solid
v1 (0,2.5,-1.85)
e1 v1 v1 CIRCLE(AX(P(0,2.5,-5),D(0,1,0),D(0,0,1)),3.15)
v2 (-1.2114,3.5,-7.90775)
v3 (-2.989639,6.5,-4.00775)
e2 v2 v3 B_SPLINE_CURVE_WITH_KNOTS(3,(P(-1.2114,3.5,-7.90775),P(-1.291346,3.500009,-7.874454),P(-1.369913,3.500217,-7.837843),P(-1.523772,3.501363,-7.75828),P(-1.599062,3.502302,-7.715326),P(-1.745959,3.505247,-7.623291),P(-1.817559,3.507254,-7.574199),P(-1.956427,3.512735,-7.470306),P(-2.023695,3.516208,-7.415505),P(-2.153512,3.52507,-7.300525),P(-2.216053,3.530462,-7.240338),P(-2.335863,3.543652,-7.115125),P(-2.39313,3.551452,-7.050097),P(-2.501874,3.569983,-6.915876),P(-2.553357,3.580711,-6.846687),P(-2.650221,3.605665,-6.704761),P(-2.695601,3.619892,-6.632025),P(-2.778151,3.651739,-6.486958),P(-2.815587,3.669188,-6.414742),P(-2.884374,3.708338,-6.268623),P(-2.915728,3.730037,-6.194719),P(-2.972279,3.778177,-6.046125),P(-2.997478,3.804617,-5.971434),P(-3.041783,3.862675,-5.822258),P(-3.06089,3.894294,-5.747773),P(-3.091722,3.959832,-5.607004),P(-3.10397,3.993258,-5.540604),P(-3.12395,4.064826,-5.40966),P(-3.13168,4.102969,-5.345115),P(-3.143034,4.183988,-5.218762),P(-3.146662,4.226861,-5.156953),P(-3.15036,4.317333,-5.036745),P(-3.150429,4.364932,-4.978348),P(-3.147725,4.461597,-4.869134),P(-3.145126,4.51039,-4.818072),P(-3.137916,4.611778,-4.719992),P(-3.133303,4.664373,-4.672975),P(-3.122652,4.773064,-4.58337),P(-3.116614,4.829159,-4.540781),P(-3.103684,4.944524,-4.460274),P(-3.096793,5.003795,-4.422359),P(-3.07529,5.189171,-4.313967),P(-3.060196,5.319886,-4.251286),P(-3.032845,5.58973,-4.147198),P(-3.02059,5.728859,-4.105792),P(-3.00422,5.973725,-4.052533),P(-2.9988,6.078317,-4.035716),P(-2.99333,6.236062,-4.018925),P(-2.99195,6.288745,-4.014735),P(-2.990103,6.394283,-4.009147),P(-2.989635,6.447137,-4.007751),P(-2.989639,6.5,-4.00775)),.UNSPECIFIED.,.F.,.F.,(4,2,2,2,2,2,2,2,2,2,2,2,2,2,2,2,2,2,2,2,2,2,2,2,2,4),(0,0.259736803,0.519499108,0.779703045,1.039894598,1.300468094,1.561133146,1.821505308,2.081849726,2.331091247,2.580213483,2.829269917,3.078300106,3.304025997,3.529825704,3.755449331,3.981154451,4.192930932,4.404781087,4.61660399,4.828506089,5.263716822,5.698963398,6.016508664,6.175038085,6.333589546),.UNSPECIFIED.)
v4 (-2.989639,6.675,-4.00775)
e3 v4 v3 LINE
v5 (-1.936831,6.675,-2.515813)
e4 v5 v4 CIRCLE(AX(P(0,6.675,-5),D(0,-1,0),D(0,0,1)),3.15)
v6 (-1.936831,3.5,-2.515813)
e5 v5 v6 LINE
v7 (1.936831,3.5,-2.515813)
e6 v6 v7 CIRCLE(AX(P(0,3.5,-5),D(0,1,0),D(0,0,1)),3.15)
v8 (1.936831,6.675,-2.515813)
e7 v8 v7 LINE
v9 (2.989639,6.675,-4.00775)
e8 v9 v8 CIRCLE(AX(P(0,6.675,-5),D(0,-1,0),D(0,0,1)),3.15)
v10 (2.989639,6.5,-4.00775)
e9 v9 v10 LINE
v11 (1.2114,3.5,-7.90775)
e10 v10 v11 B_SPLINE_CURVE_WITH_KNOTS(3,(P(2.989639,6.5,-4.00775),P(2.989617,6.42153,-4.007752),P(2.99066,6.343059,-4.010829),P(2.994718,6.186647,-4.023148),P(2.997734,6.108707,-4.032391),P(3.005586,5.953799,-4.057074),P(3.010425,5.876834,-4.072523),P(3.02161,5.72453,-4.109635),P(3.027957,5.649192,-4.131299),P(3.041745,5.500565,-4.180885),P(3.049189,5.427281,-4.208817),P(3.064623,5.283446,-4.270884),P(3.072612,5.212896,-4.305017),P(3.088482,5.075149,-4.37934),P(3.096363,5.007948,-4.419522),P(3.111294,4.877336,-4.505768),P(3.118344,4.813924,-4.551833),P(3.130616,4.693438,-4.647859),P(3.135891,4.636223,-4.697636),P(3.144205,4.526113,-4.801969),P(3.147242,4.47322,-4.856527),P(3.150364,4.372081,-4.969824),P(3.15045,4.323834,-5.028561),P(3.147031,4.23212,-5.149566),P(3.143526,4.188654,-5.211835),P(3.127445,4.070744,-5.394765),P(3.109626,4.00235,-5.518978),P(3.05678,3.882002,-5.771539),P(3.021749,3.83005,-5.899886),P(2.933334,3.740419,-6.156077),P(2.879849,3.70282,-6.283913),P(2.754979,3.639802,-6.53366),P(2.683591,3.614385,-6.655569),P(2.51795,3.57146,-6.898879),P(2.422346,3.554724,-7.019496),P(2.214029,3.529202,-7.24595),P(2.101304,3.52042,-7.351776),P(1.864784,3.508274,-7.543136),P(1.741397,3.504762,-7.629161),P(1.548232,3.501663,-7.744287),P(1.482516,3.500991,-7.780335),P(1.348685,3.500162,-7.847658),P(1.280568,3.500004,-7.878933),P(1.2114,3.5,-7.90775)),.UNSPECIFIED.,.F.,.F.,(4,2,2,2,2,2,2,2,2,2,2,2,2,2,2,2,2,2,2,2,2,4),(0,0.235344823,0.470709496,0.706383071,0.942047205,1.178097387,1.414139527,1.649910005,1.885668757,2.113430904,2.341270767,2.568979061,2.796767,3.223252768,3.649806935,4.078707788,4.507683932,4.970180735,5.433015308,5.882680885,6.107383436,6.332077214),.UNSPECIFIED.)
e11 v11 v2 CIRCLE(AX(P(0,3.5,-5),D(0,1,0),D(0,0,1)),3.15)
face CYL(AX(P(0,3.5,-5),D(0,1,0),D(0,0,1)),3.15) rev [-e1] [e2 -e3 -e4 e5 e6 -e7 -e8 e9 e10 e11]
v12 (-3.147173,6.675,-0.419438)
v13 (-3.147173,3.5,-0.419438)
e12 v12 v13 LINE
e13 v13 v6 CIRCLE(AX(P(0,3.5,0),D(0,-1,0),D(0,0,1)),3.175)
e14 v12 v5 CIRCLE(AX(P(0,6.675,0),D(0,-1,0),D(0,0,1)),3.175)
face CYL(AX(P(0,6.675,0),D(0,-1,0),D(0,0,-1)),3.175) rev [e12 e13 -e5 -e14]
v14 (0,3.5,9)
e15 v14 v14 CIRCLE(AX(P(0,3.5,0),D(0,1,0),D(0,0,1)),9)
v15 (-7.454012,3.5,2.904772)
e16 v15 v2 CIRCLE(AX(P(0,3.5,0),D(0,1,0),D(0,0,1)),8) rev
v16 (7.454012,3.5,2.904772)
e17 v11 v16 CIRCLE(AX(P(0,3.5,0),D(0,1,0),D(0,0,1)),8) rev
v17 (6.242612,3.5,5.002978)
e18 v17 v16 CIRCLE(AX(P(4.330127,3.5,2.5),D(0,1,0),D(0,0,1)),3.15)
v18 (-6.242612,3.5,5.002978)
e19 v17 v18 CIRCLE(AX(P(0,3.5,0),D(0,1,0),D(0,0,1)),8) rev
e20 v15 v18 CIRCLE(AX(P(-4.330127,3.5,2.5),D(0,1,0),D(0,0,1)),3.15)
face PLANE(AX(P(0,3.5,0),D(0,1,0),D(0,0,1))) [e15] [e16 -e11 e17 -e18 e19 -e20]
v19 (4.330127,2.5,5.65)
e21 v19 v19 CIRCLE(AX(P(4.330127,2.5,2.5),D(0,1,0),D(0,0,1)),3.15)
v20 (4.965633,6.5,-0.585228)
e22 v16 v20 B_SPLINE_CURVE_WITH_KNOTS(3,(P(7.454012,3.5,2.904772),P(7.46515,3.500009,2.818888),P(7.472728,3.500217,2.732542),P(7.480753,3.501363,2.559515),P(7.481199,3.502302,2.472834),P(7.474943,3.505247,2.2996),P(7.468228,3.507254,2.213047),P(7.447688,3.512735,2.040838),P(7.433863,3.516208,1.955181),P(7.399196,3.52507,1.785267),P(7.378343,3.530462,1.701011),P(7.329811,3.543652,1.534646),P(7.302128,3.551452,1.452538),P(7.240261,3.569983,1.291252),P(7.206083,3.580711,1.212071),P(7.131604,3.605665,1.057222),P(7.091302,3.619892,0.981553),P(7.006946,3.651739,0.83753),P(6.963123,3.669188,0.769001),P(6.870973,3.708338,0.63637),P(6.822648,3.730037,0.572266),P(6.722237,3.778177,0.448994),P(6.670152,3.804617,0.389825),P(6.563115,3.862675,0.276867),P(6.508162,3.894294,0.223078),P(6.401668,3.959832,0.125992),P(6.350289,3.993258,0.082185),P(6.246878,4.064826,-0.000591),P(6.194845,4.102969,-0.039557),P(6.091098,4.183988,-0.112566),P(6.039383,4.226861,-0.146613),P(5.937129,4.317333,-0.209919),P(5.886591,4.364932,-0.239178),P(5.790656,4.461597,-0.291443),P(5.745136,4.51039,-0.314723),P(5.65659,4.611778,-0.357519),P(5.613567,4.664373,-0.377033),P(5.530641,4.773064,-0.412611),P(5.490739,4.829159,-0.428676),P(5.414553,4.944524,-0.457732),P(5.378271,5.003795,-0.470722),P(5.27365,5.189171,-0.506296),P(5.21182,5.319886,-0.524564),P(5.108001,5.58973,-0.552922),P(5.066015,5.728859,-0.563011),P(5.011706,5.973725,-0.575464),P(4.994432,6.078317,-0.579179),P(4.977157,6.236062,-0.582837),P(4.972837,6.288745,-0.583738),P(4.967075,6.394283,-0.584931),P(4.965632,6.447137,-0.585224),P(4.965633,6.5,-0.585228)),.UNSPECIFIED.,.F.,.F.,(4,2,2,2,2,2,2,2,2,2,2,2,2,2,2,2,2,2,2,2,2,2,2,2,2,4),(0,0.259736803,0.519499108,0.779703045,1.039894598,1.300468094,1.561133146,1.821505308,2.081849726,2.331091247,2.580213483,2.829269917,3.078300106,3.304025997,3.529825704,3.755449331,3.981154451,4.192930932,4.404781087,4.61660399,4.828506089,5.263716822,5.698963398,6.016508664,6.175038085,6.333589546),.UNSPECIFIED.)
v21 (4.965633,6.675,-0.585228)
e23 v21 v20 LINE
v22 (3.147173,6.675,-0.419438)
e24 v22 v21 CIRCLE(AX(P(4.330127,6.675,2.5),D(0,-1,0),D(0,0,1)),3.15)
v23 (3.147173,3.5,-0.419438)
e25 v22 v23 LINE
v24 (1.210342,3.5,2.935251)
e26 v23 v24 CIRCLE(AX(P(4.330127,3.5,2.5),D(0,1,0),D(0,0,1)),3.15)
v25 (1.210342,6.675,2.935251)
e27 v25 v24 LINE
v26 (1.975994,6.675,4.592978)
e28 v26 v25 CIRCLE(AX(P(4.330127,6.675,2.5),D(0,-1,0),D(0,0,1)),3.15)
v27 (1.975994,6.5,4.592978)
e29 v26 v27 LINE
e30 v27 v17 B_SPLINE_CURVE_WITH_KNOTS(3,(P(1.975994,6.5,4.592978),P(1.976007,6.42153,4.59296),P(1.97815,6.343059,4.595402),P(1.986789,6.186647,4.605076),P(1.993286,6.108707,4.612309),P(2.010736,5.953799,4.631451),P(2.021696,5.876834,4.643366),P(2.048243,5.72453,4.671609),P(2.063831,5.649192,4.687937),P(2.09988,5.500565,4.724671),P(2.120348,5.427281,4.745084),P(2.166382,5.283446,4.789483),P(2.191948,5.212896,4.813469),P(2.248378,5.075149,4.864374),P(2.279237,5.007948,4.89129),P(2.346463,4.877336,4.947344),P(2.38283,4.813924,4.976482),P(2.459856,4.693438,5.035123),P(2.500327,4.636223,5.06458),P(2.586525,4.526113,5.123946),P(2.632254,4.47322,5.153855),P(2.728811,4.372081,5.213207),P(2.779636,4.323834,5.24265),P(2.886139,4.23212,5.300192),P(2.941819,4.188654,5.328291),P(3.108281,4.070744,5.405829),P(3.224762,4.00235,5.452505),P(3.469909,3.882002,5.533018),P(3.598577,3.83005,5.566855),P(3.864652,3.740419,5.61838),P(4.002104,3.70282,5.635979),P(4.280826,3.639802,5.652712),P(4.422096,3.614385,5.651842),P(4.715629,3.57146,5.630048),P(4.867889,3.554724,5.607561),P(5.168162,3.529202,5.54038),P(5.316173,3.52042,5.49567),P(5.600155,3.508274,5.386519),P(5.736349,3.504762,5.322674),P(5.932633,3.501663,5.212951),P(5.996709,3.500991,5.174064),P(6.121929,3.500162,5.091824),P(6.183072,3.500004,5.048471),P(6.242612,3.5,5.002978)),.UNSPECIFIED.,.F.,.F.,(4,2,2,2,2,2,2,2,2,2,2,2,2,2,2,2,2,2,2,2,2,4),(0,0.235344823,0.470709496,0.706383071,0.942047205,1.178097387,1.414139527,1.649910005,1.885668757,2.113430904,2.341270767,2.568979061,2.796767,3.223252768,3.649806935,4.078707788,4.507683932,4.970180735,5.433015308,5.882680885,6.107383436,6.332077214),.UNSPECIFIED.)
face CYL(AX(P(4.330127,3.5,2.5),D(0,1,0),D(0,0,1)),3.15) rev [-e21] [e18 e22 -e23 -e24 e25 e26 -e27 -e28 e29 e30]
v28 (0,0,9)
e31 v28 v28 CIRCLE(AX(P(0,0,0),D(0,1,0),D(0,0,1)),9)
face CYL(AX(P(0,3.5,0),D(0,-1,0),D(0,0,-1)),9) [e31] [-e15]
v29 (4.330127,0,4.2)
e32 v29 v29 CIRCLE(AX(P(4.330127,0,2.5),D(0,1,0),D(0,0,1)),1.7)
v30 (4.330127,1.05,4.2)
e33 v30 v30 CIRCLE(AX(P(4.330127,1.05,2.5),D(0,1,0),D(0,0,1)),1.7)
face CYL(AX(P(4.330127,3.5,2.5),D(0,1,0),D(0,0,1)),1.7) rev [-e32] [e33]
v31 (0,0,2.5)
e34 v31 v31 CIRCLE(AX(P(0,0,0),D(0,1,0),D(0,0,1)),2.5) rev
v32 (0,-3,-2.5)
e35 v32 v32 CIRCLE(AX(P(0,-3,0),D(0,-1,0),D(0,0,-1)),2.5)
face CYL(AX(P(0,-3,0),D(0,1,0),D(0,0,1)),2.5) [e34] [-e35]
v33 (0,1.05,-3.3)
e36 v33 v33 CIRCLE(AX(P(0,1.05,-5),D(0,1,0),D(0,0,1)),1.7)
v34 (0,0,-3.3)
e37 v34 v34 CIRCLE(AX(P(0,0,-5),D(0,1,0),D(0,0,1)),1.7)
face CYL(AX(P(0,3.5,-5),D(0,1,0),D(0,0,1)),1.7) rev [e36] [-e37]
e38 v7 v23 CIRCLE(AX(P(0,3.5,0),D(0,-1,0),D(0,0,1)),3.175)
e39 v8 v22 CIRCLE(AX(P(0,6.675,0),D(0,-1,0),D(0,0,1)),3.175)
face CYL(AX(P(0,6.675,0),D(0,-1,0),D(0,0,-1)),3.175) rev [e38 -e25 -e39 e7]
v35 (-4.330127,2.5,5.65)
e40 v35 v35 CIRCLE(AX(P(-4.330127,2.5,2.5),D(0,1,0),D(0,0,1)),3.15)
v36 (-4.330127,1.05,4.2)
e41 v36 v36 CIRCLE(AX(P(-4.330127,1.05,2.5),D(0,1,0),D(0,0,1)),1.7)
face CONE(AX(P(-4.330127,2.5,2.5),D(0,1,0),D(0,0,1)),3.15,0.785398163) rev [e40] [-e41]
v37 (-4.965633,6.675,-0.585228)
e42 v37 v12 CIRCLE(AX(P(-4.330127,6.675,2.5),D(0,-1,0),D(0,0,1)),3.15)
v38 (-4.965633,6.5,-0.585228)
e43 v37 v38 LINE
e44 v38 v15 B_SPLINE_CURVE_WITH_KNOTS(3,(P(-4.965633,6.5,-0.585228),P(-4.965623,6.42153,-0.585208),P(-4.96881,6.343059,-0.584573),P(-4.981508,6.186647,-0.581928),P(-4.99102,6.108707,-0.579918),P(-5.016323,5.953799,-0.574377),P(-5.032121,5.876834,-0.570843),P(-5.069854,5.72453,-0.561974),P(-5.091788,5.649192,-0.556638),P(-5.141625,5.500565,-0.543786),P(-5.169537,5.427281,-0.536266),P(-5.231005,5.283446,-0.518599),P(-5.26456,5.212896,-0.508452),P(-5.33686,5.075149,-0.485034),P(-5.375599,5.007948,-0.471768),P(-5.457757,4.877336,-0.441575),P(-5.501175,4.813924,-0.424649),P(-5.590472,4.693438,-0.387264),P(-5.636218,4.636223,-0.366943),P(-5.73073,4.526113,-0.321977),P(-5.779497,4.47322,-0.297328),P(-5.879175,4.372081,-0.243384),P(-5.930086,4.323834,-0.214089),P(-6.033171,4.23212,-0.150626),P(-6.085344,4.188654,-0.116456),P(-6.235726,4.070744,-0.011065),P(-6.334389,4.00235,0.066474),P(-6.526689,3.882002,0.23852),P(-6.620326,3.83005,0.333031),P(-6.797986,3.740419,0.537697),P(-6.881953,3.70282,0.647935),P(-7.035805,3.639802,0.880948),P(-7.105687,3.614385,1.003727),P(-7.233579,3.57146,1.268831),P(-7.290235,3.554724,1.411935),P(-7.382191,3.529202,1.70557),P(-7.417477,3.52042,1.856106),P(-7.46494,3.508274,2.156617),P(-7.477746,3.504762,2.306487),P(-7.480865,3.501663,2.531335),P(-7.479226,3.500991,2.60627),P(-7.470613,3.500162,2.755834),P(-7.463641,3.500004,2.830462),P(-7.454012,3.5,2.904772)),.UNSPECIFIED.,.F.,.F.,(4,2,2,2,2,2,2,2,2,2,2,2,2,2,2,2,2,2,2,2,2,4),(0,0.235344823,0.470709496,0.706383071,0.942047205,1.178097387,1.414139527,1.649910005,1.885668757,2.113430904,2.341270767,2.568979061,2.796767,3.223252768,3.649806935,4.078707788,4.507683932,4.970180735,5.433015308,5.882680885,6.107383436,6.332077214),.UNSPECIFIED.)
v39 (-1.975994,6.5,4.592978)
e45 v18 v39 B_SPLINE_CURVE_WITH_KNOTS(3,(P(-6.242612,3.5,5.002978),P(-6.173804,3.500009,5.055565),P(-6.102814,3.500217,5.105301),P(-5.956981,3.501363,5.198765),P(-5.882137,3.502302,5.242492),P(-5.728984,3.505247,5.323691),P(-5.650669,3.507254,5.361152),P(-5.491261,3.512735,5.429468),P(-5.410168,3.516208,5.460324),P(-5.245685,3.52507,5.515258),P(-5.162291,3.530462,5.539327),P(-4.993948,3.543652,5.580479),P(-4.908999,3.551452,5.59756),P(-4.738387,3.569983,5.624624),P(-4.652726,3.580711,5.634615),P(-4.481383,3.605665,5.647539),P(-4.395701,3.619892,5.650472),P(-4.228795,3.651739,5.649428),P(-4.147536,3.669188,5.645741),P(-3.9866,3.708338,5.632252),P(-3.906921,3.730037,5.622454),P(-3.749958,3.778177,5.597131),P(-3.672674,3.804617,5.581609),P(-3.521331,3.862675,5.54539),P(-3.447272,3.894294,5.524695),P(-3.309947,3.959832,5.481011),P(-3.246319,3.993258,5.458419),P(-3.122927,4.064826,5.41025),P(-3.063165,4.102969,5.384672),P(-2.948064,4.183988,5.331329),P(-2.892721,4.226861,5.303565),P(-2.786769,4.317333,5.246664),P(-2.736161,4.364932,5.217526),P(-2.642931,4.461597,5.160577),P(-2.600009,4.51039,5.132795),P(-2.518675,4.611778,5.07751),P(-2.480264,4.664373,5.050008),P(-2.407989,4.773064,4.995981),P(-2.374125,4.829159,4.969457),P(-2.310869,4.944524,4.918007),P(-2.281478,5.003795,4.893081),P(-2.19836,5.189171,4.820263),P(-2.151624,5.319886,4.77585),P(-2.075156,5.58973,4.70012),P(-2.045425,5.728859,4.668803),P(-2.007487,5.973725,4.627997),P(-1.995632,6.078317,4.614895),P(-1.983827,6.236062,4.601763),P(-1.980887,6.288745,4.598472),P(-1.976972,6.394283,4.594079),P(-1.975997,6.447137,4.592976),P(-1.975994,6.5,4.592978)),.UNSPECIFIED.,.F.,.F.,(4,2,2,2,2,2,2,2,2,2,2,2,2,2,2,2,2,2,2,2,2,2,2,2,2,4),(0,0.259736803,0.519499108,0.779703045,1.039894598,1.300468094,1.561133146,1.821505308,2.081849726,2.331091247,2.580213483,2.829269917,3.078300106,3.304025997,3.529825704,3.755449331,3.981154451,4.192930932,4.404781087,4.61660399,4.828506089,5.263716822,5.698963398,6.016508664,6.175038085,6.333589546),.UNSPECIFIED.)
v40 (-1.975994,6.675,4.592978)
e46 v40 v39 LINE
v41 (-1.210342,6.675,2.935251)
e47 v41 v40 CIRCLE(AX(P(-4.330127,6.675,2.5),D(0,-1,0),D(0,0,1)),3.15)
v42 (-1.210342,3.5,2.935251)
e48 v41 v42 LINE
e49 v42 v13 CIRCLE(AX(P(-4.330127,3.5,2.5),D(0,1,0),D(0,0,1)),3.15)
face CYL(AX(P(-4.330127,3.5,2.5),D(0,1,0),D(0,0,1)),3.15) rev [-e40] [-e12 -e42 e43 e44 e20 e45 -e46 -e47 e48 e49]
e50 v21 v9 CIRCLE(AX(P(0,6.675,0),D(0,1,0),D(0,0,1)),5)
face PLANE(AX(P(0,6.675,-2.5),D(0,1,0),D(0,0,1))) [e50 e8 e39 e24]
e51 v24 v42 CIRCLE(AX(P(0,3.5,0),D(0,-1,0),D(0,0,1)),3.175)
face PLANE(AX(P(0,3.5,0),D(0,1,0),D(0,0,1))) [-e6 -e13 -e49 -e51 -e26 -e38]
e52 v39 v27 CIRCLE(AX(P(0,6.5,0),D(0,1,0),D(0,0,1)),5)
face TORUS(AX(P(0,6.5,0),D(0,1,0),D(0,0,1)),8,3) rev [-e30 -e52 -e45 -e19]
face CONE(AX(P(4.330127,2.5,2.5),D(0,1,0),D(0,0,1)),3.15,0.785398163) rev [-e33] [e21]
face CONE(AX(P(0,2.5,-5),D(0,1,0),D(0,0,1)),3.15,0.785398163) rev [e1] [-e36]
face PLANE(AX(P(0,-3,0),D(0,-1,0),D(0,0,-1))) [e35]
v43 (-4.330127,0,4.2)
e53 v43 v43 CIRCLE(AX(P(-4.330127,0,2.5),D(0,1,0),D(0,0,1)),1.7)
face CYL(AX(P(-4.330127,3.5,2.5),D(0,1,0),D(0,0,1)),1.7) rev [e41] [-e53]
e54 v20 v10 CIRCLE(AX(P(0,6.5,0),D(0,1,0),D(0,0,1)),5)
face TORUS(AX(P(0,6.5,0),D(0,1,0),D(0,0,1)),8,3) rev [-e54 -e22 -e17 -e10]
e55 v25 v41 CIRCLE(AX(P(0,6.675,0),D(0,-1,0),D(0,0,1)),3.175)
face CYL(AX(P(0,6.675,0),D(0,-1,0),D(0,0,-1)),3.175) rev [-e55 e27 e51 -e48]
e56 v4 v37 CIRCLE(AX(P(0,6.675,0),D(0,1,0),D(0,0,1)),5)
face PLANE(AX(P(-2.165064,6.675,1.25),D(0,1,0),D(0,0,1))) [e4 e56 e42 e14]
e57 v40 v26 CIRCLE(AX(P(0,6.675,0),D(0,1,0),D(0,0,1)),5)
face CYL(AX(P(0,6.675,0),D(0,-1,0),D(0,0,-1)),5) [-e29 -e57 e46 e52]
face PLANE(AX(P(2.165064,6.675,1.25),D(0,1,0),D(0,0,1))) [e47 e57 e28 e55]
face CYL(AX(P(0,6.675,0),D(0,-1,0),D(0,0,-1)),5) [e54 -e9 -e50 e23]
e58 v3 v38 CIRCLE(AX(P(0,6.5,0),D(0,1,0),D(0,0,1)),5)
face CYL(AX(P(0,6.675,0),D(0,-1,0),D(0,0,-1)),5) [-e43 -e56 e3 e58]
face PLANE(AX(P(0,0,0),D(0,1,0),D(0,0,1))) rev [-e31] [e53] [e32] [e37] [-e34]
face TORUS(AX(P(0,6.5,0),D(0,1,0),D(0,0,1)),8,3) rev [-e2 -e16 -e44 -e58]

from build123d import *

# Parameters (mm, degrees)
SKETCH1_R                                      = 9
BOSS_EXTRUDE1_DEPTH                            = 3.5
CSK_FOR_M3_FLAT_HEAD_MACHINE_SCREW1_AT_2_COUNT = 2
CSK_FOR_M3_FLAT_HEAD_MACHINE_SCREW1_AT_2_PITCH = 8.660254038
CSK_FOR_M3_FLAT_HEAD_MACHINE_SCREW1_AT_3_COUNT = 2
CSK_FOR_M3_FLAT_HEAD_MACHINE_SCREW1_AT_3_PITCH = 8.660254038
BOSS_EXTRUDE2_START                            = 3.175
BOSS_EXTRUDE2_DEPTH                            = 3.175
FILLET1_R                                      = 3
SKETCH6_R                                      = 2.5
BOSS_EXTRUDE3_DEPTH                            = 3


with BuildPart() as part:
    # Sketch1 → Boss-Extrude1 (new body)
    with BuildSketch(Plane(origin=(0, 0, 0), x_dir=(1, 0, 0), z_dir=(0, 1, 0))):
        with Locations(Location((0, 0, 0), (0, 0, 270))):
            Circle(SKETCH1_R)
    extrude(amount=BOSS_EXTRUDE1_DEPTH)

    # Sketch3 → CSK for M3 Flat Head Machine Screw1 (revolve, cut)
    with BuildSketch(Plane(origin=(0, 3.5, -5), x_dir=(0, 0, 1), z_dir=(1, 0, 0))):
        Polygon((0, 0), (0, 11.021463052), (1.7, 10), (1.7, 2.45), (3.15, 1), (3.15, 0), align=None)
    csk_for_m3_flat_head_machine_screw1 = revolve(axis=Axis((0, 9.85, -5), (0, -1, 0)), mode=Mode.SUBTRACT)

    # CSK for M3 Flat Head Machine Screw1 at 2: CSK for M3 Flat Head Machine Screw1 ×2
    with Locations(*[Vector(0.5000000000000012, 0, 0.866025403784438) * (i * CSK_FOR_M3_FLAT_HEAD_MACHINE_SCREW1_AT_2_PITCH) for i in range(1, CSK_FOR_M3_FLAT_HEAD_MACHINE_SCREW1_AT_2_COUNT)]):
        add(csk_for_m3_flat_head_machine_screw1, mode=Mode.SUBTRACT)

    # CSK for M3 Flat Head Machine Screw1 at 3: CSK for M3 Flat Head Machine Screw1 ×2
    with Locations(*[Vector(-0.500000000000001, 0, 0.8660254037844382) * (i * CSK_FOR_M3_FLAT_HEAD_MACHINE_SCREW1_AT_3_PITCH) for i in range(1, CSK_FOR_M3_FLAT_HEAD_MACHINE_SCREW1_AT_3_COUNT)]):
        add(csk_for_m3_flat_head_machine_screw1, mode=Mode.SUBTRACT)

    # Sketch5 → Boss-Extrude2 (add)
    with BuildSketch(Plane(origin=(0, 3.5, 0), x_dir=(1, 0, 0), z_dir=(0, 1, 0)).offset(BOSS_EXTRUDE2_START)):
        with BuildLine():
            ThreePointArc((-1.93683052, 2.5158125), (-2.749630657, 1.5875), (-3.147172796, 0.419438184))
            ThreePointArc((-3.147172796, 0.419438184), (-4.044126051, 0.636989552), (-4.965632694, 0.585228118))
            ThreePointArc((-4.965632694, 0.585228118), (-4.330127019, 2.5), (-2.989638764, 4.00775))
            ThreePointArc((-2.989638764, 4.00775), (-2.573712159, 3.183821121), (-1.93683052, 2.5158125))
        make_face()
        with BuildLine():
            ThreePointArc((4.965632694, 0.585228118), (4.044126051, 0.636989552), (3.147172796, 0.419438184))
            ThreePointArc((3.147172796, 0.419438184), (2.749630657, 1.5875), (1.93683052, 2.5158125))
            ThreePointArc((1.93683052, 2.5158125), (2.573712159, 3.183821121), (2.989638764, 4.00775))
            ThreePointArc((2.989638764, 4.00775), (4.330127019, 2.5), (4.965632694, 0.585228118))
        make_face()
        with BuildLine():
            ThreePointArc((-1.97599393, -4.592978118), (-1.470413892, -3.820810672), (-1.210342276, -2.935250684))
            ThreePointArc((-1.210342276, -2.935250684), (0, -3.175), (1.210342276, -2.935250684))
            ThreePointArc((1.210342276, -2.935250684), (1.470413892, -3.820810672), (1.97599393, -4.592978118))
            ThreePointArc((1.97599393, -4.592978118), (0, -5), (-1.97599393, -4.592978118))
        make_face()
    extrude(amount=-BOSS_EXTRUDE2_DEPTH)

    # Fillet1
    # the kernel refuses this fillet: 3 mm, written as the material it adds along each edge
    with BuildSketch(Plane(origin=(0, 3.5, 0), x_dir=(-0.1868450460832527, 0, 0.9823893977207547), z_dir=(0.9823893977207547, 0, 0.1868450460832527))) as fillet1_piece_1_section:
        with BuildLine():
            CenterArc((5 + FILLET1_R, -FILLET1_R), FILLET1_R, 90, 90)
            Line((5, -FILLET1_R), (5, 0))
            Line((5, 0), (5 + FILLET1_R, 0))
        make_face()
    fillet1_piece_1 = revolve(axis=Axis((0, 3.5, 0), (0, -1, 0)), revolution_arc=218.462556698, mode=Mode.PRIVATE)
    fillet1_piece_1 = fillet1_piece_1 - Plane(origin=(-4.330127019, 4.03591181, 2.5), x_dir=(0, 0, 1), z_dir=(0, 1, 0)) * Cylinder(3.15, 33, mode=Mode.PRIVATE)
    fillet1_piece_1 = fillet1_piece_1 - Plane(origin=(0, 4.03591181, -5), x_dir=(0, 0, 1), z_dir=(0, 1, 0)) * Cylinder(3.15, 33, mode=Mode.PRIVATE)
    add(fillet1_piece_1)
    with BuildSketch(Plane(origin=(0, 3.5, 0), x_dir=(0.9441966978762919, 0, -0.3293821423810138), z_dir=(-0.3293821423810138, 0, -0.9441966978762919))) as fillet1_piece_2_section:
        with BuildLine():
            CenterArc((5 + FILLET1_R, -FILLET1_R), FILLET1_R, 90, 90)
            Line((5, -FILLET1_R), (5, 0))
            Line((5, 0), (5 + FILLET1_R, 0))
        make_face()
    fillet1_piece_2 = revolve(axis=Axis((0, 3.5, 0), (0, -1, 0)), revolution_arc=218.462556698, mode=Mode.PRIVATE)
    fillet1_piece_2 = fillet1_piece_2 - Plane(origin=(-4.330127019, 4.035911774, 2.5), x_dir=(0, 0, 1), z_dir=(0, 1, 0)) * Cylinder(3.15, 33, mode=Mode.PRIVATE)
    fillet1_piece_2 = fillet1_piece_2 - Plane(origin=(4.330127019, 4.035911774, 2.5), x_dir=(0, 0, 1), z_dir=(0, 1, 0)) * Cylinder(3.15, 33, mode=Mode.PRIVATE)
    add(fillet1_piece_2)
    with BuildSketch(Plane(origin=(0, 3.5, 0), x_dir=(-0.7573516517930461, 0, -0.6530072553397431), z_dir=(-0.6530072553397431, 0, 0.7573516517930461))) as fillet1_piece_3_section:
        with BuildLine():
            CenterArc((5 + FILLET1_R, -FILLET1_R), FILLET1_R, 90, 90)
            Line((5, -FILLET1_R), (5, 0))
            Line((5, 0), (5 + FILLET1_R, 0))
        make_face()
    fillet1_piece_3 = revolve(axis=Axis((0, 3.5, 0), (0, -1, 0)), revolution_arc=218.462556698, mode=Mode.PRIVATE)
    fillet1_piece_3 = fillet1_piece_3 - Plane(origin=(4.330127019, 4.035911774, 2.5), x_dir=(0, 0, 1), z_dir=(0, 1, 0)) * Cylinder(3.15, 32, mode=Mode.PRIVATE)
    fillet1_piece_3 = fillet1_piece_3 - Plane(origin=(0, 4.035911774, -5), x_dir=(0, 0, 1), z_dir=(0, 1, 0)) * Cylinder(3.15, 32, mode=Mode.PRIVATE)
    add(fillet1_piece_3)

    # Sketch6 → Boss-Extrude3 (add)
    with BuildSketch(Plane.XZ):
        with Locations(Location((0, 0, 0), (0, 0, 90))):
            Circle(SKETCH6_R)
    extrude(amount=BOSS_EXTRUDE3_DEPTH)


solid = part.part
